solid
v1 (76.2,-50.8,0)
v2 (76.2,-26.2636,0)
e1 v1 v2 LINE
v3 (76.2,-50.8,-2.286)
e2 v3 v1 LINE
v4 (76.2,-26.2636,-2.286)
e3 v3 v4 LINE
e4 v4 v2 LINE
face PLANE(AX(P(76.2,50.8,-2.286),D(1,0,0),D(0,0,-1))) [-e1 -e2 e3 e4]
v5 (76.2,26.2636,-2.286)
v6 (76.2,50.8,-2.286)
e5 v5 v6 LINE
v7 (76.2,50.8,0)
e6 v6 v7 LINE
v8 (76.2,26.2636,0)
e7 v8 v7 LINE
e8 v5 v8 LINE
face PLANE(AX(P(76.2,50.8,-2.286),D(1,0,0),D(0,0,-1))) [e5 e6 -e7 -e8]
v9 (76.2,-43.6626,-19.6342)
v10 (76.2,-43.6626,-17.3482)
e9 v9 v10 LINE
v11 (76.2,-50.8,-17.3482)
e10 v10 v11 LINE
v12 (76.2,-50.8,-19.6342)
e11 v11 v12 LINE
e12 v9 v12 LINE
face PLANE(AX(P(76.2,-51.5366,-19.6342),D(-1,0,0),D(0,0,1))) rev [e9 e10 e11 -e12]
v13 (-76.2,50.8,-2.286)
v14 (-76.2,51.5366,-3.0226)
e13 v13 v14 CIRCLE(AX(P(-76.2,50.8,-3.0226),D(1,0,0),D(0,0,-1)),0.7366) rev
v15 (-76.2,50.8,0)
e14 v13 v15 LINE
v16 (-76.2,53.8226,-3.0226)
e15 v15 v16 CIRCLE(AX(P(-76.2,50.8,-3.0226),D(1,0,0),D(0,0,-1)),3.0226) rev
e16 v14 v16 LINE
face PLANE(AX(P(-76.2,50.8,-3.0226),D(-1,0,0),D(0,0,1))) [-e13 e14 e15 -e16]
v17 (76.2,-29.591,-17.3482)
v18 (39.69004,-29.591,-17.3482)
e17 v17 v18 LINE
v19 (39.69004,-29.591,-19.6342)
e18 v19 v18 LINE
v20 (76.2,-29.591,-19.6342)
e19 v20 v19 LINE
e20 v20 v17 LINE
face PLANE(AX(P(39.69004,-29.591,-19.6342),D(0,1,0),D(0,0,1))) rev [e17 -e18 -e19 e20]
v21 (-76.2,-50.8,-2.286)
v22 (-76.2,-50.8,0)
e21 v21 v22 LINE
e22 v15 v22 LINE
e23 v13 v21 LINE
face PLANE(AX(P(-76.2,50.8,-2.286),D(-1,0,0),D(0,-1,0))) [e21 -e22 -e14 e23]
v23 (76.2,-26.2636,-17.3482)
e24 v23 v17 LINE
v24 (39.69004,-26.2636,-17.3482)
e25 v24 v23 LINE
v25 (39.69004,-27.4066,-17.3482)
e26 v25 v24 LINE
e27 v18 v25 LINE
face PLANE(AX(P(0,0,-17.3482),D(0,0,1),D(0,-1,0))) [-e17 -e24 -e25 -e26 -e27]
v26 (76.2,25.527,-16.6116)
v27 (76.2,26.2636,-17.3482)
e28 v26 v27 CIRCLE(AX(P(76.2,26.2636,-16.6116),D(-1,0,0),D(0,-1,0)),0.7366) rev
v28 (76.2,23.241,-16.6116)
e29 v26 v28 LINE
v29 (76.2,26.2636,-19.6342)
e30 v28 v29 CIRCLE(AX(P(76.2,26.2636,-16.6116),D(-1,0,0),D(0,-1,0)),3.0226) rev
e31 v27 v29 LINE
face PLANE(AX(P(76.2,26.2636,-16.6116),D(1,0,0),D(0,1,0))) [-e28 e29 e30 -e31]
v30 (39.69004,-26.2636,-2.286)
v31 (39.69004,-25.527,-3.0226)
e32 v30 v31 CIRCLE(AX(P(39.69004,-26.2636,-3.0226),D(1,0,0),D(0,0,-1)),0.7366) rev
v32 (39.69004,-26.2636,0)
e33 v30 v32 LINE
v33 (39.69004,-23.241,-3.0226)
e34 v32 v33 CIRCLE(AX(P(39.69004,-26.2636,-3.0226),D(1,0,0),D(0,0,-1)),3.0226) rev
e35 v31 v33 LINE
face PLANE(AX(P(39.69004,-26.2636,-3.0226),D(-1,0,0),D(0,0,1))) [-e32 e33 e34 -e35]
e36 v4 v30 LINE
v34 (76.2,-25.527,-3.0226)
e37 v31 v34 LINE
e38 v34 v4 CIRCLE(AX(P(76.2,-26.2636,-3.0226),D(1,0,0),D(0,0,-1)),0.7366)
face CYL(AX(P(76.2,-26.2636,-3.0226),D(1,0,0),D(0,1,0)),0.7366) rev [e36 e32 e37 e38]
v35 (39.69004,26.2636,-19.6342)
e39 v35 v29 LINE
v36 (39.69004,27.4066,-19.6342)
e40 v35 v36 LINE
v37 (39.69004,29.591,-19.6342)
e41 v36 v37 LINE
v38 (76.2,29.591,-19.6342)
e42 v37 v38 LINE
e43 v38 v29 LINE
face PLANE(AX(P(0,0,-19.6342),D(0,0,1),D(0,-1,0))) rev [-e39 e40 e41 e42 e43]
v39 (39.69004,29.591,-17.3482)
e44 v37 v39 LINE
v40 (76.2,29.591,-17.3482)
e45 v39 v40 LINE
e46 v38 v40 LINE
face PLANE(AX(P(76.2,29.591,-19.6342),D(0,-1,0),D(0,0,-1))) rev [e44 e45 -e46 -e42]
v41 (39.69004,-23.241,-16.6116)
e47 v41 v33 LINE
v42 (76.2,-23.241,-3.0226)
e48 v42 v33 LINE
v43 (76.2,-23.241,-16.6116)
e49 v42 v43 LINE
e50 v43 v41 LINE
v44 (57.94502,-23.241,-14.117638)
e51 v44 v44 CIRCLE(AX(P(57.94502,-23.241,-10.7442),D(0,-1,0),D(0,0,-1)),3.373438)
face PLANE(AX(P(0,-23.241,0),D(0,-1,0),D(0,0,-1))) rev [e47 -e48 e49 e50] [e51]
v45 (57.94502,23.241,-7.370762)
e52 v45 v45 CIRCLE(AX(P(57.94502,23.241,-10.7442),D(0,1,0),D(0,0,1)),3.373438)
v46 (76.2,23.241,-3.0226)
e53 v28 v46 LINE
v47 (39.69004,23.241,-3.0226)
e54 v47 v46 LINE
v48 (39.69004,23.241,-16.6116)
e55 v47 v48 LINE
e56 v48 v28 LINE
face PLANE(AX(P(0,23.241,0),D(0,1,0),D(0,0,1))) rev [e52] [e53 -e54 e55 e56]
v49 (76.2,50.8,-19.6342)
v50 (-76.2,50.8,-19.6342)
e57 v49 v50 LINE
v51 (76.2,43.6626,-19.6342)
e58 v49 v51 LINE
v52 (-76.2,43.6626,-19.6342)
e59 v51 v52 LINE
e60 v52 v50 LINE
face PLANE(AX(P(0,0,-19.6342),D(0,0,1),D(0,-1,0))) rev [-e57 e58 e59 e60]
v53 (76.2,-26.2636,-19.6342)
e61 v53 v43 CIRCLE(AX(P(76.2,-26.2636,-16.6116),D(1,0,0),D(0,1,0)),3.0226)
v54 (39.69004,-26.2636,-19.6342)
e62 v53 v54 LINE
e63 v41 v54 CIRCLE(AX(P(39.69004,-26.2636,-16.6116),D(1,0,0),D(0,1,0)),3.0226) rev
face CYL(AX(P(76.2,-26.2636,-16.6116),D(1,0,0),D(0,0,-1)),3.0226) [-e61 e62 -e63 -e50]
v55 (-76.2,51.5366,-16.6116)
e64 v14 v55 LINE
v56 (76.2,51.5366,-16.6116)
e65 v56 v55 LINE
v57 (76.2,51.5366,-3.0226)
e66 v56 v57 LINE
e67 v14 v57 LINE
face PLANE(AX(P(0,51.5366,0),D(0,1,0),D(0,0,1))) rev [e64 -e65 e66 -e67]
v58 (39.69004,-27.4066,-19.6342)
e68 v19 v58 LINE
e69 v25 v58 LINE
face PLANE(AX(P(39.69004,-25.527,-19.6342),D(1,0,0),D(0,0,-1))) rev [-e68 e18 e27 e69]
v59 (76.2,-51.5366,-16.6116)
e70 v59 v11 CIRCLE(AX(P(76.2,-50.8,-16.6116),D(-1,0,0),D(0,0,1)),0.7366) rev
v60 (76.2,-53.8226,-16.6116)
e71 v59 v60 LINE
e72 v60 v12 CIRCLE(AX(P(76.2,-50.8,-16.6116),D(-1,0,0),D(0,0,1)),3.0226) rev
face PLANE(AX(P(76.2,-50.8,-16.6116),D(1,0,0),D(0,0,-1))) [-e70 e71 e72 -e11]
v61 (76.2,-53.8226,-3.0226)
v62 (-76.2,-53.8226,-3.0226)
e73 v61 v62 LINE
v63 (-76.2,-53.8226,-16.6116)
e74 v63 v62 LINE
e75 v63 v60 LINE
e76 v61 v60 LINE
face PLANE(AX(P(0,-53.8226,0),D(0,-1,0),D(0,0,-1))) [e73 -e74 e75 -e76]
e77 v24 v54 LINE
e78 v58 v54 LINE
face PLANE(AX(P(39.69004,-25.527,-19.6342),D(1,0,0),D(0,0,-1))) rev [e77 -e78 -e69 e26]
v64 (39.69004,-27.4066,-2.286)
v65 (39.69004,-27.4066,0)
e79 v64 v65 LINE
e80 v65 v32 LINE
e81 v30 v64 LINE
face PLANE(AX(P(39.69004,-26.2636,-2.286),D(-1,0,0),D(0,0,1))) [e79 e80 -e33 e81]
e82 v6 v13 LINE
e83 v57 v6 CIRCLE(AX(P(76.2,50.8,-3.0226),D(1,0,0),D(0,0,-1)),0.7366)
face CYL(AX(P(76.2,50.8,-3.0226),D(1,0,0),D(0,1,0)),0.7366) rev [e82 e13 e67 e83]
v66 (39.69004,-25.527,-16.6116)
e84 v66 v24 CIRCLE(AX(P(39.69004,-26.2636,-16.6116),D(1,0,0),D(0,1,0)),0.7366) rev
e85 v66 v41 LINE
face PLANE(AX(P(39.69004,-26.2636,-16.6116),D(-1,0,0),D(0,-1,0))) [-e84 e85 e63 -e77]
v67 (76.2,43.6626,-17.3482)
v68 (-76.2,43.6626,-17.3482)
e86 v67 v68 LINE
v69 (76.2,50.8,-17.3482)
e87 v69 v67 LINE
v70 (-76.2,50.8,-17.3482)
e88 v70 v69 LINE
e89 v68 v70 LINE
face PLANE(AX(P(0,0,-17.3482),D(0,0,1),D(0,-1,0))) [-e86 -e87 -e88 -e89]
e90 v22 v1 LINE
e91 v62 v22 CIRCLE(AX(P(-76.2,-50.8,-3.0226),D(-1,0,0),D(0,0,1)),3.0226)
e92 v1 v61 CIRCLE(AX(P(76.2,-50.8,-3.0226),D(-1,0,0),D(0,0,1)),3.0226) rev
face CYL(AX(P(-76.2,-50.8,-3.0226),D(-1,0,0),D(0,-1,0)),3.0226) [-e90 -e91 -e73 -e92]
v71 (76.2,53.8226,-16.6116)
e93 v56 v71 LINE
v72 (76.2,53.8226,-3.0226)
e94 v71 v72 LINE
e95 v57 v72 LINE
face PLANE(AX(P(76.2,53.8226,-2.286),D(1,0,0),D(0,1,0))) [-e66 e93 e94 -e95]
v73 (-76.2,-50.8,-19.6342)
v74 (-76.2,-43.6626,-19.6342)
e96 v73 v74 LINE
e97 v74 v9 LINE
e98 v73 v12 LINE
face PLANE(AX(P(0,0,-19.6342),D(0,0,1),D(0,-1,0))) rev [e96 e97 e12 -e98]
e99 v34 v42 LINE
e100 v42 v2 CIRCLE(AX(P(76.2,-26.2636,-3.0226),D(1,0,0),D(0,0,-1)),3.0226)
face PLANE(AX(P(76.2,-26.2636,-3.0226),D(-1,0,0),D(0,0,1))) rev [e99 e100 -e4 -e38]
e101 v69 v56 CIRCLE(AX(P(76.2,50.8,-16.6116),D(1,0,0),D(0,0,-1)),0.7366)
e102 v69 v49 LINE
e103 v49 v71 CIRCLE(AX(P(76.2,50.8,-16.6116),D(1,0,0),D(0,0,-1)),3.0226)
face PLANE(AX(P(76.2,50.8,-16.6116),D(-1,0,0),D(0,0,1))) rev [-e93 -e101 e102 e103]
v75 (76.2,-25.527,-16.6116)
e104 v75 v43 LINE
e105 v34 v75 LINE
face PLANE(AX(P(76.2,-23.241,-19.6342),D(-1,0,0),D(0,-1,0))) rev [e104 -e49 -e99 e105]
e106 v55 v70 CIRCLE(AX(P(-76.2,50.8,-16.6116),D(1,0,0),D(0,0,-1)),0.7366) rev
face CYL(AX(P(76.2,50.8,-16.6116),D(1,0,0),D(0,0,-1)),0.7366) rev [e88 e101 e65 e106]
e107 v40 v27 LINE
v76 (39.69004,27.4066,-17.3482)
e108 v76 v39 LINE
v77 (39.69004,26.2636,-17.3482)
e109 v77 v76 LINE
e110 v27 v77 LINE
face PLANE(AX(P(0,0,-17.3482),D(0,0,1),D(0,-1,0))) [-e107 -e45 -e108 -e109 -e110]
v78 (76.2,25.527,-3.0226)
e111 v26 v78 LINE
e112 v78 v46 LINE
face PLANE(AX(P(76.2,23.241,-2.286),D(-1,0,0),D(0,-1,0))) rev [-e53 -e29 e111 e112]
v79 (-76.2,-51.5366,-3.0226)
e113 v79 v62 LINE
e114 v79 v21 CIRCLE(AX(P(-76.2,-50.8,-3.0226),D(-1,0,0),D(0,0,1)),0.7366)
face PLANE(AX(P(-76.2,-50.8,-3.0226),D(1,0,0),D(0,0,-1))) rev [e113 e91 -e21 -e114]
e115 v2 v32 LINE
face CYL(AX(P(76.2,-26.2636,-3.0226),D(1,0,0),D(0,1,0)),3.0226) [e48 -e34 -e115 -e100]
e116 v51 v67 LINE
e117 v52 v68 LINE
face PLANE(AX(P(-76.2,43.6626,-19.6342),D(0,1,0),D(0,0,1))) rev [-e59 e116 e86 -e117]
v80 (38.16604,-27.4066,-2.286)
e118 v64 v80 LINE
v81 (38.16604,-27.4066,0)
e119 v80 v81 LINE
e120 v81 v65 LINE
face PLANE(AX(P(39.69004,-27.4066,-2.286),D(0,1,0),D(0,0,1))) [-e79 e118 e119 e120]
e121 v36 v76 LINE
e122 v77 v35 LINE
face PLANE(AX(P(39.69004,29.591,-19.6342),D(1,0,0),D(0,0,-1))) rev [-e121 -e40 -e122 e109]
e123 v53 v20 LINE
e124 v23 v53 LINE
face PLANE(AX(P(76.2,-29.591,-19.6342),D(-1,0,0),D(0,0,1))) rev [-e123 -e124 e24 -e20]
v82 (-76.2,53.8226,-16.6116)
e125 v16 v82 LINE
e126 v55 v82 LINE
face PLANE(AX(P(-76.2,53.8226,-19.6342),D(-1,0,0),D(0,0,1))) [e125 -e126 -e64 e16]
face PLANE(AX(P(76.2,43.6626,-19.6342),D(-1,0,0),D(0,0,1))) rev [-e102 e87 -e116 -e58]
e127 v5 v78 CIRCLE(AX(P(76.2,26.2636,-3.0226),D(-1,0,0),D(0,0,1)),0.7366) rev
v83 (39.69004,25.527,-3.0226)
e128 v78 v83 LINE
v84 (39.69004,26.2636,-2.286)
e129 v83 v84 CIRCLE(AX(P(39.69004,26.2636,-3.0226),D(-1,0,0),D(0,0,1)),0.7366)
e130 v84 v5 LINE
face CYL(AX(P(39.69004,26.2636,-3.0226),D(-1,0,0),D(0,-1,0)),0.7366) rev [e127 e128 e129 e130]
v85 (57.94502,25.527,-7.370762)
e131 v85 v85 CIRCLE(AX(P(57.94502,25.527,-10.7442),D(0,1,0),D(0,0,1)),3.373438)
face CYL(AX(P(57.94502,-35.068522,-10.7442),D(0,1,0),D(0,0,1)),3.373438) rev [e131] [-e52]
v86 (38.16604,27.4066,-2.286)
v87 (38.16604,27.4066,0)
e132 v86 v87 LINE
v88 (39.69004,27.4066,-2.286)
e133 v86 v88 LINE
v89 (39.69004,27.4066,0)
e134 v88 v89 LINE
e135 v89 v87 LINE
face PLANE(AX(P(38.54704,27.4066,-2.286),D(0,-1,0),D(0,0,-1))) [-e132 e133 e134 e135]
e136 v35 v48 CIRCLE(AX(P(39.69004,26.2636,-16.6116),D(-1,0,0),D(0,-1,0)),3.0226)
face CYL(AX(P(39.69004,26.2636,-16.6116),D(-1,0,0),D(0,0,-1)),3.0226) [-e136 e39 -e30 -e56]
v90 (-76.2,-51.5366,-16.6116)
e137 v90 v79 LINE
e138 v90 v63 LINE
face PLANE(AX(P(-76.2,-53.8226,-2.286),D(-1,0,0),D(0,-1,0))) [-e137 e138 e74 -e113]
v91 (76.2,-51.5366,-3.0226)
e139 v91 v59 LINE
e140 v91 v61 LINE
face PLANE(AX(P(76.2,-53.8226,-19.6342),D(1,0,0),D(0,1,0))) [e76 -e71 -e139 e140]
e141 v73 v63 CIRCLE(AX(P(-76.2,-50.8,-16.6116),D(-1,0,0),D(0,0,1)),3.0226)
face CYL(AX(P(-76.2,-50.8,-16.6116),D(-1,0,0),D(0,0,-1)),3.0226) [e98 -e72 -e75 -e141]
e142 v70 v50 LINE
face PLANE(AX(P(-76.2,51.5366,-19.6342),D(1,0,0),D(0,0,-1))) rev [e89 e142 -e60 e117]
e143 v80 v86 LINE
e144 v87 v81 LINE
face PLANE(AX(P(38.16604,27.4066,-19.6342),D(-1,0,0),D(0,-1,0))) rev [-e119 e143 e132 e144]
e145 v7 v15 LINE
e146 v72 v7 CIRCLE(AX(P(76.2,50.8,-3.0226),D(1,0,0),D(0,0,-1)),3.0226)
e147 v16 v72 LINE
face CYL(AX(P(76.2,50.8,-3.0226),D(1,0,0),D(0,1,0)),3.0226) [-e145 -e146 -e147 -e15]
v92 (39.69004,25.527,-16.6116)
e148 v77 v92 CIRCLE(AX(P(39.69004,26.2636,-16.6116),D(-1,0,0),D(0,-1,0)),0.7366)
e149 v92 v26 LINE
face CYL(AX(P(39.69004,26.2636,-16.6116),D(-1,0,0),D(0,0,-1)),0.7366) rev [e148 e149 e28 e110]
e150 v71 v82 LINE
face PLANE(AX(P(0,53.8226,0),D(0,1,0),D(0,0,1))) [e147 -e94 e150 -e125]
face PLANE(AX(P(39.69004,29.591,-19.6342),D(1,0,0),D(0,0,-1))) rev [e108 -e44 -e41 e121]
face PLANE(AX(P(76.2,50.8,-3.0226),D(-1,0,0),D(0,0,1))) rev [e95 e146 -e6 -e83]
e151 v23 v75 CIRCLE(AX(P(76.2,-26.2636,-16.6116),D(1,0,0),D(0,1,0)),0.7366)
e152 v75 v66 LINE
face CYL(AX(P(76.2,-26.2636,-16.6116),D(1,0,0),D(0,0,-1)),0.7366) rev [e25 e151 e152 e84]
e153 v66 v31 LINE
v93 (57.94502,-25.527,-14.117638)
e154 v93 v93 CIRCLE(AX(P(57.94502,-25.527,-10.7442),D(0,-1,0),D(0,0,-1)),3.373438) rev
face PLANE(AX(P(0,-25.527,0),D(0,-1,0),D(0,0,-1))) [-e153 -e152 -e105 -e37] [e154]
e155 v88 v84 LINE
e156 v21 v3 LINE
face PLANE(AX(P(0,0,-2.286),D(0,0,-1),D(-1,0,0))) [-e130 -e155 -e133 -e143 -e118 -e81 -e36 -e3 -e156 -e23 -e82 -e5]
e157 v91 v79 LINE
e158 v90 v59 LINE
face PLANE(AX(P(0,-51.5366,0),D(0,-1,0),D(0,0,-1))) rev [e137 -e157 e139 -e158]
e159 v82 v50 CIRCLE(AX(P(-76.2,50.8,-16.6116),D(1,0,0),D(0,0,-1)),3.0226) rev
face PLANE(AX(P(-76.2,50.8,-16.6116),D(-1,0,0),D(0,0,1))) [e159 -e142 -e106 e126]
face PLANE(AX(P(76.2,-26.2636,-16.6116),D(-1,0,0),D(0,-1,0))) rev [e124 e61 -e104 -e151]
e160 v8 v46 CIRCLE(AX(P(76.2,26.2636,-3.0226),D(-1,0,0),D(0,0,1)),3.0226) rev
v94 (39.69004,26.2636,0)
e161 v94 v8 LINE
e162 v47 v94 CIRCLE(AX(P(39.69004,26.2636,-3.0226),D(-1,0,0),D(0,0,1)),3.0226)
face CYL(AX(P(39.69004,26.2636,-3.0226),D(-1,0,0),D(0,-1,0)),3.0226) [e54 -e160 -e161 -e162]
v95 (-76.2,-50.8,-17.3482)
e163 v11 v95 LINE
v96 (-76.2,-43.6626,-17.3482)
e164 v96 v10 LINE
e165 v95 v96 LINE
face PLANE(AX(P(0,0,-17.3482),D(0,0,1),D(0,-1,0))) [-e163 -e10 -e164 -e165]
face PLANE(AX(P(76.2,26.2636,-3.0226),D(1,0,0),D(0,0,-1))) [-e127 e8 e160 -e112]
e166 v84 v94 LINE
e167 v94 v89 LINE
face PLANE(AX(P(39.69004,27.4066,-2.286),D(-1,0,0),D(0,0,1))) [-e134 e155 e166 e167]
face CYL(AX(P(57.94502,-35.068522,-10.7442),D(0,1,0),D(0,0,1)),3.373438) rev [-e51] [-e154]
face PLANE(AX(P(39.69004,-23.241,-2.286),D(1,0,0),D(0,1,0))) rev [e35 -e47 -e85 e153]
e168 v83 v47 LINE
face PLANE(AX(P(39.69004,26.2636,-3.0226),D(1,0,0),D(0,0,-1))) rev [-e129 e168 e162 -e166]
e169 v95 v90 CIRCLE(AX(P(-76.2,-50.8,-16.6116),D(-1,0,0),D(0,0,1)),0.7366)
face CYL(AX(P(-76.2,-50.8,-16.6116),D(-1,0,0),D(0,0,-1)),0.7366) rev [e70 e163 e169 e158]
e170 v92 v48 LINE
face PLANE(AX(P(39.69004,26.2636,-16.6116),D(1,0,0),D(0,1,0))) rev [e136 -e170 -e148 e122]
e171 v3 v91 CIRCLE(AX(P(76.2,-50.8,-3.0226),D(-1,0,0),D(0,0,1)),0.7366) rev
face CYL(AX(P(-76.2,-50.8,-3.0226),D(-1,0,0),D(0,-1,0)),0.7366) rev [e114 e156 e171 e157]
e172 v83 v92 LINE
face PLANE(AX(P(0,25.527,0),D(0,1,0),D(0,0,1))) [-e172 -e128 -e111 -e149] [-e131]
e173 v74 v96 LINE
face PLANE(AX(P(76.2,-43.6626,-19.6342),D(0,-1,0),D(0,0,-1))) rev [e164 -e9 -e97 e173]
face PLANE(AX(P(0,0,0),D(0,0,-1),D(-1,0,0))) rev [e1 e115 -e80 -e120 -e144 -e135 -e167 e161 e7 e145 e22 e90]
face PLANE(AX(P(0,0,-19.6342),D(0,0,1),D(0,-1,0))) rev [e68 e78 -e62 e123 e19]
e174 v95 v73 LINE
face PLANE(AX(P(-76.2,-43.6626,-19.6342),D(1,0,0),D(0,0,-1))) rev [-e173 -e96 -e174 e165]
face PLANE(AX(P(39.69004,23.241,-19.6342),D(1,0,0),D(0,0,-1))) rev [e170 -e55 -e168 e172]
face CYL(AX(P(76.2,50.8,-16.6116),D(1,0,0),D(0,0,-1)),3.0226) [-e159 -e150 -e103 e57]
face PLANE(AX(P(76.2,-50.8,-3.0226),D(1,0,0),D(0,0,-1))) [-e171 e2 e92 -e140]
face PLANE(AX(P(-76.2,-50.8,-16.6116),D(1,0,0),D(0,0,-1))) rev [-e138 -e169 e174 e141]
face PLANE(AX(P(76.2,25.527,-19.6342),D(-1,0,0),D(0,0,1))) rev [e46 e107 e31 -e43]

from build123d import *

# Parameters (mm, degrees)
SKETCH1_W                      = 152.4
SKETCH1_H                      = 101.6
BASE_FLANGE1_DEPTH             = 2.286
EDGE_FLANGE1_DEPTH             = 152.4
EDGE_FLANGE2_DEPTH             = 152.4
SKETCH14_W                     = 36.50996
SKETCH14_H                     = 46.482
CUT_EXTRUDE1_DEPTH             = 96.335271964
EDGE_FLANGE3_START             = 38.54704
EDGE_FLANGE3_DEPTH             = 37.65296
EDGE_FLANGE3_2_DEPTH           = 1.143
EDGE_FLANGE3_START_2           = 39.69004
EDGE_FLANGE3_3_DEPTH           = 36.50996
EDGE_FLANGE4_START             = 38.54704
EDGE_FLANGE4_DEPTH             = 37.65296
EDGE_FLANGE4_2_DEPTH           = 1.143
EDGE_FLANGE4_START_2           = 39.69004
EDGE_FLANGE4_3_DEPTH           = 36.50996
CUT_EXTRUDE3_REACH             = 112.14
SKETCH22_R                     = 3.3734375
CUT_EXTRUDE3_DIRECTION_2_REACH = 112.14
EDGE_FLANGE5_STRIP_W           = 10.6172
EDGE_FLANGE5_STRIP_H           = 2.286
EDGE_FLANGE5_STRIP_CUT_DEPTH   = 36.50996
EDGE_FLANGE5_DEPTH             = 36.50996
EDGE_FLANGE6_STRIP_W           = 10.6172
EDGE_FLANGE6_STRIP_H           = 2.286
EDGE_FLANGE6_STRIP_CUT_DEPTH   = 36.50996
EDGE_FLANGE6_DEPTH             = 36.50996
EDGE_FLANGE7_STRIP_W           = 10.6172
EDGE_FLANGE7_STRIP_H           = 2.286
EDGE_FLANGE7_STRIP_CUT_DEPTH   = 152.4
EDGE_FLANGE7_DEPTH             = 152.4
EDGE_FLANGE8_STRIP_W           = 10.6172
EDGE_FLANGE8_STRIP_H           = 2.286
EDGE_FLANGE8_STRIP_CUT_DEPTH   = 152.4
EDGE_FLANGE8_DEPTH             = 152.4
SKETCH35_W                     = 1.524
SKETCH35_H                     = 54.8132
CUT_EXTRUDE4_DEPTH             = 96.335271964


# Read off the part's stored shape, not the designer's step: Edge-Flange3, Edge-Flange4
# Sheet-metal steps are written as plain solids
with BuildPart() as part:
    # Sketch1 → Base-Flange1 (new body)
    with BuildSketch(Plane.XY):
        Rectangle(SKETCH1_W, SKETCH1_H)
    extrude(amount=-BASE_FLANGE1_DEPTH)

    # Edge-Flange1 section (across the edge) → Edge-Flange1 (add)
    with BuildSketch(Plane(origin=(-76.2, 51.5366, -2.286), x_dir=(0, -1, 0), z_dir=(1, 0, 0))):
        with BuildLine():
            Line((-2.286, 0.7366), (-2.286, 17.3482))
            Line((-2.286, 17.3482), (0, 17.3482))
            Line((0, 17.3482), (0, 0.7366))
            ThreePointArc((0, 0.7366), (0.215745145, 0.215745145), (0.7366, 0))
            Line((0.7366, 0), (0.7366, -2.286))
            ThreePointArc((0.7366, -2.286), (-1.400700957, -1.400700957), (-2.286, 0.7366))
        make_face()
    extrude(amount=EDGE_FLANGE1_DEPTH)

    # Edge-Flange2 section (across the edge) → Edge-Flange2 (add)
    with BuildSketch(Plane(origin=(76.2, -51.5366, -2.286), x_dir=(0, 1, 0), z_dir=(-1, 0, 0))):
        with BuildLine():
            Line((-2.286, 0.7366), (-2.286, 17.3482))
            Line((-2.286, 17.3482), (0, 17.3482))
            Line((0, 17.3482), (0, 0.7366))
            ThreePointArc((0, 0.7366), (0.215745145, 0.215745145), (0.7366, 0))
            Line((0.7366, 0), (0.7366, -2.286))
            ThreePointArc((0.7366, -2.286), (-1.400700957, -1.400700957), (-2.286, 0.7366))
        make_face()
    extrude(amount=EDGE_FLANGE2_DEPTH)

    # Sketch14 → Cut-Extrude1 (cut, through all)
    with BuildSketch(Plane.XY):
        with Locations((57.94502, 0)):
            Rectangle(SKETCH14_W, SKETCH14_H)
    extrude(amount=-CUT_EXTRUDE1_DEPTH, mode=Mode.SUBTRACT)

    # Edge-Flange3 outline → Edge-Flange3 (cut)
    with BuildSketch(Plane.YZ.offset(EDGE_FLANGE3_START)):
        with BuildLine():
            ThreePointArc((-26.2636, 0), (-24.404882216, -0.639056638), (-23.332127469, -2.286))
            Line((-23.332127469, -2.286), (-23.241, -2.286))
            Line((-23.241, -2.286), (-23.241, 0))
            Line((-23.241, 0), (-26.2636, 0))
        make_face()
    extrude(amount=EDGE_FLANGE3_DEPTH, mode=Mode.SUBTRACT)

    # Edge-Flange3 2 outline → Edge-Flange3 2 (cut)
    with BuildSketch(Plane.YZ.offset(EDGE_FLANGE3_START)):
        with BuildLine():
            Line((-27.4066, -2.286), (-23.332127469, -2.286))
            ThreePointArc((-23.332127469, -2.286), (-24.404882216, -0.639056638), (-26.2636, 0))
            Line((-26.2636, 0), (-27.4066, 0))
            Line((-27.4066, 0), (-27.4066, -2.286))
        make_face()
    extrude(amount=EDGE_FLANGE3_2_DEPTH, mode=Mode.SUBTRACT)

    # Edge-Flange3 3 outline → Edge-Flange3 3 (add)
    with BuildSketch(Plane.YZ.offset(EDGE_FLANGE3_START_2)):
        with BuildLine():
            Line((-25.527, -19.6342), (-23.241, -19.6342))
            Line((-23.241, -19.6342), (-23.241, -3.0226))
            ThreePointArc((-23.241, -3.0226), (-23.263868376, -2.651492275), (-23.332127469, -2.286))
            Line((-23.332127469, -2.286), (-26.2636, -2.286))
            ThreePointArc((-26.2636, -2.286), (-25.742745145, -2.501745145), (-25.527, -3.0226))
            Line((-25.527, -3.0226), (-25.527, -19.6342))
        make_face()
    extrude(amount=EDGE_FLANGE3_3_DEPTH)

    # Edge-Flange4 outline → Edge-Flange4 (cut)
    with BuildSketch(Plane.YZ.offset(EDGE_FLANGE4_START)):
        with BuildLine():
            Line((23.241, -2.286), (23.332127469, -2.286))
            ThreePointArc((23.332127469, -2.286), (24.404882216, -0.639056638), (26.2636, 0))
            Line((26.2636, 0), (23.241, 0))
            Line((23.241, 0), (23.241, -2.286))
        make_face()
    extrude(amount=EDGE_FLANGE4_DEPTH, mode=Mode.SUBTRACT)

    # Edge-Flange4 2 outline → Edge-Flange4 2 (cut)
    with BuildSketch(Plane.YZ.offset(EDGE_FLANGE4_START)):
        with BuildLine():
            Line((23.332127469, -2.286), (27.4066, -2.286))
            Line((27.4066, -2.286), (27.4066, 0))
            Line((27.4066, 0), (26.2636, 0))
            ThreePointArc((26.2636, 0), (24.404882216, -0.639056638), (23.332127469, -2.286))
        make_face()
    extrude(amount=EDGE_FLANGE4_2_DEPTH, mode=Mode.SUBTRACT)

    # Edge-Flange4 3 outline → Edge-Flange4 3 (add)
    with BuildSketch(Plane.YZ.offset(EDGE_FLANGE4_START_2)):
        with BuildLine():
            Line((23.241, -19.6342), (25.527, -19.6342))
            Line((25.527, -19.6342), (25.527, -3.0226))
            ThreePointArc((25.527, -3.0226), (25.742745145, -2.501745145), (26.2636, -2.286))
            Line((26.2636, -2.286), (23.332127469, -2.286))
            ThreePointArc((23.332127469, -2.286), (23.263868376, -2.651492275), (23.241, -3.0226))
            Line((23.241, -3.0226), (23.241, -19.6342))
        make_face()
    extrude(amount=EDGE_FLANGE4_3_DEPTH)

    # Cut-Extrude3: up to this face of the body (flat: up to its plane)
    cut_extrude3_end = Plane(part.part.faces().sort_by_distance((57.94502, -25.527, -11.3284))[0])
    # Sketch22 → Cut-Extrude3 (cut, up to the picked face)
    with BuildSketch(Plane(origin=(0, -23.241, 0), x_dir=(1, 0, 0), z_dir=(0, 1, 0)), mode=Mode.PRIVATE) as cut_extrude3_sk1:
        with Locations(Location((57.94502, 10.7442, 0), (0, 0, 270))):
            Circle(SKETCH22_R)
    cut_extrude3_tool1 = split(extrude(cut_extrude3_sk1.sketch, amount=-CUT_EXTRUDE3_REACH, mode=Mode.PRIVATE), bisect_by=cut_extrude3_end, keep=Keep.BOTH, mode=Mode.PRIVATE)
    add(cut_extrude3_tool1.solids().sort_by(Axis((57.94502, -23.241, -10.7442), (0, -1, 0)))[0], mode=Mode.SUBTRACT)

    # Cut-Extrude3 direction 2: up to this face of the body (flat: up to its plane)
    cut_extrude3_direction_2_end = Plane(part.part.faces().sort_by_distance((57.94502, 25.527, -11.3284))[0])
    # Sketch22 → Cut-Extrude3 direction 2 (cut, up to the picked face)
    with BuildSketch(Plane(origin=(0, -23.241, 0), x_dir=(1, 0, 0), z_dir=(0, 1, 0)), mode=Mode.PRIVATE) as cut_extrude3_direction_2_sk1:
        with Locations(Location((57.94502, 10.7442, 0), (0, 0, 270))):
            Circle(SKETCH22_R)
    cut_extrude3_direction_2_tool1 = split(extrude(cut_extrude3_direction_2_sk1.sketch, amount=CUT_EXTRUDE3_DIRECTION_2_REACH, mode=Mode.PRIVATE), bisect_by=cut_extrude3_direction_2_end, keep=Keep.BOTH, mode=Mode.PRIVATE)
    add(cut_extrude3_direction_2_tool1.solids().sort_by(Axis((57.94502, -23.241, -10.7442), (0, 1, 0)))[0], mode=Mode.SUBTRACT)

    # Edge-Flange5 strip (across the edge) → Edge-Flange5 strip cut (cut)
    with BuildSketch(Plane(origin=(39.69004, -25.527, -19.6342), x_dir=(0, 0, 1), z_dir=(1, 0, 0))):
        with Locations((-2.286, -1.143)):
            Rectangle(EDGE_FLANGE5_STRIP_W, EDGE_FLANGE5_STRIP_H)
    extrude(amount=EDGE_FLANGE5_STRIP_CUT_DEPTH, mode=Mode.SUBTRACT)

    # Edge-Flange5 section (across the edge) → Edge-Flange5 (add)
    with BuildSketch(Plane(origin=(39.69004, -25.527, -19.6342), x_dir=(0, 0, 1), z_dir=(1, 0, 0))):
        with BuildLine():
            Line((0, 0.7366), (0, 4.064))
            Line((0, 4.064), (2.286, 4.064))
            Line((2.286, 4.064), (2.286, 0.7366))
            ThreePointArc((2.286, 0.7366), (2.501745145, 0.215745145), (3.0226, 0))
            Line((3.0226, 0), (3.0226, -2.286))
            ThreePointArc((3.0226, -2.286), (0.885299043, -1.400700957), (0, 0.7366))
        make_face()
    extrude(amount=EDGE_FLANGE5_DEPTH)

    # Edge-Flange6 strip (across the edge) → Edge-Flange6 strip cut (cut)
    with BuildSketch(Plane(origin=(76.2, 25.527, -19.6342), x_dir=(0, 0, 1), z_dir=(-1, 0, 0))):
        with Locations((-2.286, -1.143)):
            Rectangle(EDGE_FLANGE6_STRIP_W, EDGE_FLANGE6_STRIP_H)
    extrude(amount=EDGE_FLANGE6_STRIP_CUT_DEPTH, mode=Mode.SUBTRACT)

    # Edge-Flange6 section (across the edge) → Edge-Flange6 (add)
    with BuildSketch(Plane(origin=(76.2, 25.527, -19.6342), x_dir=(0, 0, 1), z_dir=(-1, 0, 0))):
        with BuildLine():
            Line((0, 0.7366), (0, 4.064))
            Line((0, 4.064), (2.286, 4.064))
            Line((2.286, 4.064), (2.286, 0.7366))
            ThreePointArc((2.286, 0.7366), (2.501745145, 0.215745145), (3.0226, 0))
            Line((3.0226, 0), (3.0226, -2.286))
            ThreePointArc((3.0226, -2.286), (0.885299043, -1.400700957), (0, 0.7366))
        make_face()
    extrude(amount=EDGE_FLANGE6_DEPTH)

    # Edge-Flange7 strip (across the edge) → Edge-Flange7 strip cut (cut)
    with BuildSketch(Plane(origin=(76.2, -51.5366, -19.6342), x_dir=(0, 0, 1), z_dir=(-1, 0, 0))):
        with Locations((-2.286, -1.143)):
            Rectangle(EDGE_FLANGE7_STRIP_W, EDGE_FLANGE7_STRIP_H)
    extrude(amount=EDGE_FLANGE7_STRIP_CUT_DEPTH, mode=Mode.SUBTRACT)

    # Edge-Flange7 section (across the edge) → Edge-Flange7 (add)
    with BuildSketch(Plane(origin=(76.2, -51.5366, -19.6342), x_dir=(0, 0, 1), z_dir=(-1, 0, 0))):
        with BuildLine():
            Line((0, 0.7366), (0, 7.874))
            Line((0, 7.874), (2.286, 7.874))
            Line((2.286, 7.874), (2.286, 0.7366))
            ThreePointArc((2.286, 0.7366), (2.501745145, 0.215745145), (3.0226, 0))
            Line((3.0226, 0), (3.0226, -2.286))
            ThreePointArc((3.0226, -2.286), (0.885299043, -1.400700957), (0, 0.7366))
        make_face()
    extrude(amount=EDGE_FLANGE7_DEPTH)

    # Edge-Flange8 strip (across the edge) → Edge-Flange8 strip cut (cut)
    with BuildSketch(Plane(origin=(-76.2, 51.5366, -19.6342), x_dir=(0, 0, 1), z_dir=(1, 0, 0))):
        with Locations((-2.286, -1.143)):
            Rectangle(EDGE_FLANGE8_STRIP_W, EDGE_FLANGE8_STRIP_H)
    extrude(amount=EDGE_FLANGE8_STRIP_CUT_DEPTH, mode=Mode.SUBTRACT)

    # Edge-Flange8 section (across the edge) → Edge-Flange8 (add)
    with BuildSketch(Plane(origin=(-76.2, 51.5366, -19.6342), x_dir=(0, 0, 1), z_dir=(1, 0, 0))):
        with BuildLine():
            Line((0, 0.7366), (0, 7.874))
            Line((0, 7.874), (2.286, 7.874))
            Line((2.286, 7.874), (2.286, 0.7366))
            ThreePointArc((2.286, 0.7366), (2.501745145, 0.215745145), (3.0226, 0))
            Line((3.0226, 0), (3.0226, -2.286))
            ThreePointArc((3.0226, -2.286), (0.885299043, -1.400700957), (0, 0.7366))
        make_face()
    extrude(amount=EDGE_FLANGE8_DEPTH)

    # Sketch35 → Cut-Extrude4 (cut, through all)
    with BuildSketch(Plane.XY):
        with Locations((38.92804, 0)):
            Rectangle(SKETCH35_W, SKETCH35_H)
    extrude(amount=-CUT_EXTRUDE4_DEPTH, mode=Mode.SUBTRACT)


solid = part.part
